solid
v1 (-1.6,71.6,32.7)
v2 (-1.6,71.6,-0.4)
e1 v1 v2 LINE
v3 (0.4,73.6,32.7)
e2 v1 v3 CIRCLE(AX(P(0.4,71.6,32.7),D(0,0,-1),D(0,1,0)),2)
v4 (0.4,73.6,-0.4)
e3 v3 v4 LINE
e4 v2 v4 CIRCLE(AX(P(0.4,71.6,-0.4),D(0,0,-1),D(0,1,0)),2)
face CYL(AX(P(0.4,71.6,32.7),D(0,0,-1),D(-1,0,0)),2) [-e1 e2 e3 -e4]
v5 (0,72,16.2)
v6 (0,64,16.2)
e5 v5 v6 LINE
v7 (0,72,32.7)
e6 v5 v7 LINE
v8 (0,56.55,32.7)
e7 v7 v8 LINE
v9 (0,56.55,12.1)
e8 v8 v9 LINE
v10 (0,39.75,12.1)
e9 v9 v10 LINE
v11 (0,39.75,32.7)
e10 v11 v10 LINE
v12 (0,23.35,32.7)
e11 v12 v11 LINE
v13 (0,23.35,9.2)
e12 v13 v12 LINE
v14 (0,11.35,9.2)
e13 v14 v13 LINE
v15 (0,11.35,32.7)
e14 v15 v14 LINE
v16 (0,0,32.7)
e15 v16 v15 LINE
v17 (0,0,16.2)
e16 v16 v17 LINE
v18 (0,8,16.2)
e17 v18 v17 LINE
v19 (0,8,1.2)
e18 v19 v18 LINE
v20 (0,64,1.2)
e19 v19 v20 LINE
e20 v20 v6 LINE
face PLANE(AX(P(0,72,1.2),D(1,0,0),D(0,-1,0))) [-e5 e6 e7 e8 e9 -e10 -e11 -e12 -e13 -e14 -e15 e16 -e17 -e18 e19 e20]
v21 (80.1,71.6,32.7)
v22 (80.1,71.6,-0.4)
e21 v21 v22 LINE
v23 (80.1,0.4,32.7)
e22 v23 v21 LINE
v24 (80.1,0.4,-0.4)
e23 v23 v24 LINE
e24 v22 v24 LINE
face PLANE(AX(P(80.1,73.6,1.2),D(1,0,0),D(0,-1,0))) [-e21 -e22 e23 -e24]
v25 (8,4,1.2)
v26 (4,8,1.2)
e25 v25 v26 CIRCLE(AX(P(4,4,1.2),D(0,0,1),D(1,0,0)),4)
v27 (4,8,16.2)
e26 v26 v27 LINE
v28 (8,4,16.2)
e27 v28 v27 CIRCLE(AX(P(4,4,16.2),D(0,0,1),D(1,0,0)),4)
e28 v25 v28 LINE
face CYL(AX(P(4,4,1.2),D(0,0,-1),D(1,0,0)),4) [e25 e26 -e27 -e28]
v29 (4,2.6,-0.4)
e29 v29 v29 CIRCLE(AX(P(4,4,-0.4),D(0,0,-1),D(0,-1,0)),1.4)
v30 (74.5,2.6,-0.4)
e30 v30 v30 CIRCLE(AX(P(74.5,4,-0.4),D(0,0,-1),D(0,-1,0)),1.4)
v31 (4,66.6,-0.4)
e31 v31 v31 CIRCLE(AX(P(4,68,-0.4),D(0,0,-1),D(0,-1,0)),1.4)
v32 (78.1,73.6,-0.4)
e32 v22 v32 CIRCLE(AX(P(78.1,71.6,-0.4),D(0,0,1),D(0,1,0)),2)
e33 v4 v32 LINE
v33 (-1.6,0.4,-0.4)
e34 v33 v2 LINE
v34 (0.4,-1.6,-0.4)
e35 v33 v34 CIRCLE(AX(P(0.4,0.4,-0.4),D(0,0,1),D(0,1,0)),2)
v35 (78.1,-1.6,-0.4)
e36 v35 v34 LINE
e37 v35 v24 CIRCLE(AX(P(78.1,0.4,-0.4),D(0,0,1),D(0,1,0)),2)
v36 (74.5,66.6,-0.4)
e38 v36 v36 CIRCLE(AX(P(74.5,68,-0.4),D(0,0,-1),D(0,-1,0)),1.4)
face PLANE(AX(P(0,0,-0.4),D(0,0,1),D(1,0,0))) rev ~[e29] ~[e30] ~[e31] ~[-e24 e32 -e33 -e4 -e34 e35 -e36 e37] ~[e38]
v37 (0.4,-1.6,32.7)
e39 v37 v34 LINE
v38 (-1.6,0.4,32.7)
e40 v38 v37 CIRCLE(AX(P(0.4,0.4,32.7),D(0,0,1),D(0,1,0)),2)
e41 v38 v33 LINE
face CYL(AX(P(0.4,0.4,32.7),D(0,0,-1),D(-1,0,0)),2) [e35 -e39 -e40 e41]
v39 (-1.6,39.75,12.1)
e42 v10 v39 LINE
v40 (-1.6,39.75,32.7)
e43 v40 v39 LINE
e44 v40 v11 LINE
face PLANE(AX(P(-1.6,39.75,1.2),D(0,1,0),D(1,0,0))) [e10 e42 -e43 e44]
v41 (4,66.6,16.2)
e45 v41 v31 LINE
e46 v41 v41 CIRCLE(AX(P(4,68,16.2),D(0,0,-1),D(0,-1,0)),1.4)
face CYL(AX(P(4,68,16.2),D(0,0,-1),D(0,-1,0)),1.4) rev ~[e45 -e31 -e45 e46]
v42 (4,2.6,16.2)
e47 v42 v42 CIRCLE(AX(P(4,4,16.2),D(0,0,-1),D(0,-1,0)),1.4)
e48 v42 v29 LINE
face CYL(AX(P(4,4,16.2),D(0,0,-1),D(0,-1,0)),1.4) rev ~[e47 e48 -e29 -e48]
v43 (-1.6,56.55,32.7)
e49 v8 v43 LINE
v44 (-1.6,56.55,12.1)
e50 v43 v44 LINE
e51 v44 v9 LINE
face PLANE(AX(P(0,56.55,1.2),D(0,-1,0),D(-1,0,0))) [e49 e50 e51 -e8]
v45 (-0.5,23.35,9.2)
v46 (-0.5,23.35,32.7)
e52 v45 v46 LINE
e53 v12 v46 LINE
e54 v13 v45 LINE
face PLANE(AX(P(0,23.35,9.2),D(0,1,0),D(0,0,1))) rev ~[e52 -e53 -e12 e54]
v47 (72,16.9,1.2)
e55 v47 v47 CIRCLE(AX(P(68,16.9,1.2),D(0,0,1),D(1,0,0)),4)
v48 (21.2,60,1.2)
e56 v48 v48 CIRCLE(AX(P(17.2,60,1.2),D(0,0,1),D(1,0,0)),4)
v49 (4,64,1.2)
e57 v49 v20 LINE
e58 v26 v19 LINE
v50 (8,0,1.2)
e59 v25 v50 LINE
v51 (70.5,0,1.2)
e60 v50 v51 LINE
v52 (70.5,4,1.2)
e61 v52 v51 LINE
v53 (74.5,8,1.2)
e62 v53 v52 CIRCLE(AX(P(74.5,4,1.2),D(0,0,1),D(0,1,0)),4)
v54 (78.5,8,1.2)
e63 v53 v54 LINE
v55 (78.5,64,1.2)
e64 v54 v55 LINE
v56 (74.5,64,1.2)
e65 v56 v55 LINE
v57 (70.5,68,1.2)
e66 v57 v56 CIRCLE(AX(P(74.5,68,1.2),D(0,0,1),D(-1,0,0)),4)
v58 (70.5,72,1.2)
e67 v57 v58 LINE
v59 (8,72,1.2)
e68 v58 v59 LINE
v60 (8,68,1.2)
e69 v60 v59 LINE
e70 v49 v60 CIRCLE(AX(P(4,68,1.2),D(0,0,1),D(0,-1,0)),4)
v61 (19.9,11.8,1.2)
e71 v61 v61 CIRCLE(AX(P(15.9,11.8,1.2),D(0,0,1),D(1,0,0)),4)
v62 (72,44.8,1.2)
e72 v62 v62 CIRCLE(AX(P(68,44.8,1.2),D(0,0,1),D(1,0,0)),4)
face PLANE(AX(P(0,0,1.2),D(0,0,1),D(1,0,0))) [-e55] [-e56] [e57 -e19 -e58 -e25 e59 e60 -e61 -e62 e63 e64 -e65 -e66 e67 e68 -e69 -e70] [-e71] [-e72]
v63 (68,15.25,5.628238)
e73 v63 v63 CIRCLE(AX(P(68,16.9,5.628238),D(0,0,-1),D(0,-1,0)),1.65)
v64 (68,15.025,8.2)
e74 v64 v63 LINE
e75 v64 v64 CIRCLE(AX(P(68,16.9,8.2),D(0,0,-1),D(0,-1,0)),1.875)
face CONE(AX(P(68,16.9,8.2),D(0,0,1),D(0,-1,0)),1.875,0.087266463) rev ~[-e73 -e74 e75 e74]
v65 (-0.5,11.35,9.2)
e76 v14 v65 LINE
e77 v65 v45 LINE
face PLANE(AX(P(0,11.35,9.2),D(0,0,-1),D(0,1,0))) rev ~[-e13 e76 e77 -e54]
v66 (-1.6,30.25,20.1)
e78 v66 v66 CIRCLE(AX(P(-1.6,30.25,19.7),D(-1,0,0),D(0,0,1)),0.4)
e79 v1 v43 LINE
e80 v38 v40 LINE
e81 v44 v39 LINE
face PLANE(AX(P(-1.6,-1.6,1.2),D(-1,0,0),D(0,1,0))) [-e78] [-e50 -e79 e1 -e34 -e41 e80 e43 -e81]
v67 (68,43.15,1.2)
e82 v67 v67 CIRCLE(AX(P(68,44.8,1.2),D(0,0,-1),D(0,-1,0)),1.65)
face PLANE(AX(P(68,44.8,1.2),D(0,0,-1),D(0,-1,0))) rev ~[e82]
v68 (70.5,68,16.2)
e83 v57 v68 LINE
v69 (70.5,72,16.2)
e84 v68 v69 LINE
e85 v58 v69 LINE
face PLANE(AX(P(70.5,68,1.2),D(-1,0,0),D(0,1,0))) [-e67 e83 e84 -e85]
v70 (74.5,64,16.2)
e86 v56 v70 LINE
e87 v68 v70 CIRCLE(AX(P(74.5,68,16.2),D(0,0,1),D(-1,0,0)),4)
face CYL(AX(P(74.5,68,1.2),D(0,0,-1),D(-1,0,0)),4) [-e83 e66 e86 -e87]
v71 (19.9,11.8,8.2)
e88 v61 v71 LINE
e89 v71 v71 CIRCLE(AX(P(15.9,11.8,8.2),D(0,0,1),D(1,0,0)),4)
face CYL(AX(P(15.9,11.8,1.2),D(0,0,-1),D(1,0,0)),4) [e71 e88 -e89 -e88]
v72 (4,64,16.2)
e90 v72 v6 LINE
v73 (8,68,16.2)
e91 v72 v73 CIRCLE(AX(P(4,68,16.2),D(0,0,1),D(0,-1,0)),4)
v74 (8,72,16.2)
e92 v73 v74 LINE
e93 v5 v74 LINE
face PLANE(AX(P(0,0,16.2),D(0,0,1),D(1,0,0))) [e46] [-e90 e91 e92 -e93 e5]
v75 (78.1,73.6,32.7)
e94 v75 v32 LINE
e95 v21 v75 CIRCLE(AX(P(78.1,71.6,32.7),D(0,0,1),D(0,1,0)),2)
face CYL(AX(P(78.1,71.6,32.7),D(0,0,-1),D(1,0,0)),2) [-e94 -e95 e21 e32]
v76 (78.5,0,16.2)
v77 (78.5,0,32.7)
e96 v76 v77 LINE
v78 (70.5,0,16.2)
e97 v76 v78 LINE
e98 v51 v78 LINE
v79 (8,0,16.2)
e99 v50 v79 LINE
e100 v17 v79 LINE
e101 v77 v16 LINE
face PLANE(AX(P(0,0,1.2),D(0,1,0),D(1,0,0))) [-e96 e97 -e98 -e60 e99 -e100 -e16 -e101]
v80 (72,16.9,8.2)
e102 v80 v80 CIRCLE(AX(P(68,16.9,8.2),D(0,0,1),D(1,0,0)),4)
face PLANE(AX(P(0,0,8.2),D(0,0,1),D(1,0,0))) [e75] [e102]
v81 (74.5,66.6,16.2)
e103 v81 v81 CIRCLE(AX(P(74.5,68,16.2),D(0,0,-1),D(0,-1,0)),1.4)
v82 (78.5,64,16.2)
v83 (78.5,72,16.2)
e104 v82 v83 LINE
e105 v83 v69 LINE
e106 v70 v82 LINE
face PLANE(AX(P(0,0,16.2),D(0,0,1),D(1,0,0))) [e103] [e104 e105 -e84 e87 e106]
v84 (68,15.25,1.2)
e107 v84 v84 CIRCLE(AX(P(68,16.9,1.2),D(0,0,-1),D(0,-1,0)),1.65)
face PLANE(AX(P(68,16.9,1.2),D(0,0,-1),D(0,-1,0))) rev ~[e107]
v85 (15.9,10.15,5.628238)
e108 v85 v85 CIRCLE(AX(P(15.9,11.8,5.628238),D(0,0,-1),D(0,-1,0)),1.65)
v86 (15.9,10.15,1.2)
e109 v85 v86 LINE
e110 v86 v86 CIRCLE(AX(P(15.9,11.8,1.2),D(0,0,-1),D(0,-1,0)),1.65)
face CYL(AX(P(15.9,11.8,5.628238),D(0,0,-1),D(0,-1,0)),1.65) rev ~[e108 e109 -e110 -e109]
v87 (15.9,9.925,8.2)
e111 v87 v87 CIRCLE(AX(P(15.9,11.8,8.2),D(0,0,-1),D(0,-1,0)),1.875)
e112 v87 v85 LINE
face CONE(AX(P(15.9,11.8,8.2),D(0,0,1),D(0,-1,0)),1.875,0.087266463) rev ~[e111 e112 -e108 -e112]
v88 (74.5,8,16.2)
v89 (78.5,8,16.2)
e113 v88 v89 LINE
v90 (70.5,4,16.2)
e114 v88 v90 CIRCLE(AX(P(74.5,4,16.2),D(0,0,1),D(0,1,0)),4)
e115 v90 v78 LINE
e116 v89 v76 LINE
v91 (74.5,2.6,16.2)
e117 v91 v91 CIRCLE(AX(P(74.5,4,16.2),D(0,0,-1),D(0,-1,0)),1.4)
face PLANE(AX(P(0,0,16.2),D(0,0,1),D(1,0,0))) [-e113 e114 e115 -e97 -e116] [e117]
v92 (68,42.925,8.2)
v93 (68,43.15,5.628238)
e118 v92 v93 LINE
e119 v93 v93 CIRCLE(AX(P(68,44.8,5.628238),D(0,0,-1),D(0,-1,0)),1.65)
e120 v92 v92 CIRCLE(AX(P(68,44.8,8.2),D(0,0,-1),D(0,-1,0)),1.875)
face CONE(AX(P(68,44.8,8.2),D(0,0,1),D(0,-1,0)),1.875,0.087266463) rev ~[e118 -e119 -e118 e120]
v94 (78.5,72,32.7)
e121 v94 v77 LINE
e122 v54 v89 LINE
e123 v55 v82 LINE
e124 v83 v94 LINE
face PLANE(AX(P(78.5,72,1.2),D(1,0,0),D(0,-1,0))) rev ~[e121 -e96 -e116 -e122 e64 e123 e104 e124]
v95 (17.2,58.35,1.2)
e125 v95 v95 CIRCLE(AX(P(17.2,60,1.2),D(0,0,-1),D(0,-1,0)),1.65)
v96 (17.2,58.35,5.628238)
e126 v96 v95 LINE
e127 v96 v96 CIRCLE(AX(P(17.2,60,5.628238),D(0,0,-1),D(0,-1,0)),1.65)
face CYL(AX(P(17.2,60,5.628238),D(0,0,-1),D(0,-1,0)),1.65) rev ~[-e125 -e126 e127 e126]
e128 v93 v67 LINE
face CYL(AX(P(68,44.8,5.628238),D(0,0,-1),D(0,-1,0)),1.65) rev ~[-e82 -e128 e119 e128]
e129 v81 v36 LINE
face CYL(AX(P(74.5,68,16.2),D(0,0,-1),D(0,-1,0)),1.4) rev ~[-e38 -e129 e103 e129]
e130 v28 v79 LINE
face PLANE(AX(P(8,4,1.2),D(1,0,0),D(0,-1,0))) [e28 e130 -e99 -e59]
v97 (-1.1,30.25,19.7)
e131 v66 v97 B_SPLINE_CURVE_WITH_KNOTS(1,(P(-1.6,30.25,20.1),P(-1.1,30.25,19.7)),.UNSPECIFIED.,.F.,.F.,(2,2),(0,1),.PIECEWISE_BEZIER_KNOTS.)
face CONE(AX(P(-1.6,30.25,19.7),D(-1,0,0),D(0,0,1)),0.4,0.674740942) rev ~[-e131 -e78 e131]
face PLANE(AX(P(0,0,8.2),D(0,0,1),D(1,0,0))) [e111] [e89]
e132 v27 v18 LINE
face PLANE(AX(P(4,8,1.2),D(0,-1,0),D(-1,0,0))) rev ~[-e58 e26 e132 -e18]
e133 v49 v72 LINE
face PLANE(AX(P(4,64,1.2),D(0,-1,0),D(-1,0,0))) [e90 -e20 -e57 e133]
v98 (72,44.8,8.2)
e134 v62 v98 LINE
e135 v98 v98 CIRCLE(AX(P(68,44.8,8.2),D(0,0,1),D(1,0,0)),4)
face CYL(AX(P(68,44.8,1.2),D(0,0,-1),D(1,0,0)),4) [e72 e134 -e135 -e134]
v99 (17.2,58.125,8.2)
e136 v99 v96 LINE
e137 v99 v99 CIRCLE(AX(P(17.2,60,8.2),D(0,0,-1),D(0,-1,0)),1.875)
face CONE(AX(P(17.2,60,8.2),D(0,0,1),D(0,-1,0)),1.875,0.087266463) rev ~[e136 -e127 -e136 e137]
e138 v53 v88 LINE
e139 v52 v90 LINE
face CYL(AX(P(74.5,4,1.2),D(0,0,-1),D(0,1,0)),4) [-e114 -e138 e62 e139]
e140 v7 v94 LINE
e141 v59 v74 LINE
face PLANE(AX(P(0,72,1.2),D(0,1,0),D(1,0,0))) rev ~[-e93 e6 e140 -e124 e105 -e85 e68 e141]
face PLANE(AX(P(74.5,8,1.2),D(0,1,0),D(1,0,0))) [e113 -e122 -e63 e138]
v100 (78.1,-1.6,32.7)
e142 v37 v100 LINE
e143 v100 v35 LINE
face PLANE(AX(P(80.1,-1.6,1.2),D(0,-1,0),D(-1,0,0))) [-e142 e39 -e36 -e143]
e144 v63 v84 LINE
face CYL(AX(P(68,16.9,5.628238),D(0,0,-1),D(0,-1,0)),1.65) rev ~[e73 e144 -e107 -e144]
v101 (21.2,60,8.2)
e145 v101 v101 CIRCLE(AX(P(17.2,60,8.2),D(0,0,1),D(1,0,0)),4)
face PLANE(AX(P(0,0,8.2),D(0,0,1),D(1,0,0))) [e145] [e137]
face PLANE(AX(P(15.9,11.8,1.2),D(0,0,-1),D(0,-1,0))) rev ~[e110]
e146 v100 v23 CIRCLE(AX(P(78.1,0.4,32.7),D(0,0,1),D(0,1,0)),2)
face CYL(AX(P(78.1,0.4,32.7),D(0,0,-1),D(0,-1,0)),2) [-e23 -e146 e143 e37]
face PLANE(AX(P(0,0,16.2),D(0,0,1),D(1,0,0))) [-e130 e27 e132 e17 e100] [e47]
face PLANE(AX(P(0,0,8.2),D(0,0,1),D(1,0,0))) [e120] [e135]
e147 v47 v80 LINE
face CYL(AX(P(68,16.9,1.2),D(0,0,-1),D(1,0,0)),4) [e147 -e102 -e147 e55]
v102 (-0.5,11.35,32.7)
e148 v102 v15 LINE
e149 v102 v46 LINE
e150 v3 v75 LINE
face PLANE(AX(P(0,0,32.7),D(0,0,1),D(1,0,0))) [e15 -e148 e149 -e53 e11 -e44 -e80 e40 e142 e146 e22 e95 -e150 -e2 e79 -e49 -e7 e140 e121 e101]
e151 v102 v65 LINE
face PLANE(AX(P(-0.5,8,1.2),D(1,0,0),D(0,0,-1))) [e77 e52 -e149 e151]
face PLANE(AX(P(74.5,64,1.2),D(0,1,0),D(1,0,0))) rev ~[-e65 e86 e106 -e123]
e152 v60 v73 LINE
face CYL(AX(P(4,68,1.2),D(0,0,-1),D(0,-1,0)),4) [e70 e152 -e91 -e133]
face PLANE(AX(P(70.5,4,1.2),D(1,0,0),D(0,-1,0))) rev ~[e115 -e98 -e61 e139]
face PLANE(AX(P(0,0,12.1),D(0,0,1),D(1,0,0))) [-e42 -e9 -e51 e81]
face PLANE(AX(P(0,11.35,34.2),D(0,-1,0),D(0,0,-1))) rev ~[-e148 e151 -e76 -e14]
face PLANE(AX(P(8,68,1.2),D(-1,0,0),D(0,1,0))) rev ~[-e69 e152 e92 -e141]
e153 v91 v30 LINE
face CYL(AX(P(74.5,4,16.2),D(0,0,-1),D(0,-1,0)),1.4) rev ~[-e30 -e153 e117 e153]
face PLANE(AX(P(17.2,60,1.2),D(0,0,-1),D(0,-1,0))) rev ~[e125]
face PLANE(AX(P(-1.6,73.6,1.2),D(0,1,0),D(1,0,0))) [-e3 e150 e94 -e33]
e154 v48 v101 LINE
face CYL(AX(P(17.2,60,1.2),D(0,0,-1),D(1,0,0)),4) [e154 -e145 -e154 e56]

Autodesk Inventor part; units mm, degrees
ref_plane "YZ Plane" through (0, 0, 0) normal (1, 0, 0) x (0, 1, 0)
ref_plane "XZ Plane" through (0, 0, 0) normal (0, 1, 0) x (-1, 0, 0)
sketch "Zakladna" plane through (0, 0, 0) normal (0, 0, 1) x (1, 0, 0)
  line L0 (0, 0) -> (78.5, 0)
  line L1 (78.5, 0) -> (78.5, 72)
  line L2 (78.5, 72) -> (0, 72)
  line L3 (0, 72) -> (0, 0)
  dimension "d0" = 78.5
  dimension "d1" = 72
extrude "Extrusion1" add sketch "Zakladna" along normal blind 1.2 and the other way blind 0.4
sketch "Uchyt_arduino" plane through (0, 0, 1.2) normal (0, 0, 1) x (1, 0, 0)
  circle A0 centre (17.2, 60) radius 4
  circle A1 centre (68, 44.8) radius 4
  circle A2 centre (68, 16.9) radius 4
  circle A3 centre (15.9, 11.8) radius 4
  line L0 (0, 72) -> (0, 0) projected
  dimension "d33" = 8
  dimension "d35" = 8
  dimension "d37" = 8
  dimension "d163" = 17.2
  dimension "d171" = 27.9
  dimension "d173" = 1.3
  dimension "d174" = 50.8
  dimension "d175" = 48.2
  dimension "d176" = 15.2
sketch "Spojeni_srouby" plane through (0, 0, 1.2) normal (0, 0, 1) x (1, 0, 0)
  line L0 (8, 4) -> (8, 0)
  arc A0 (8, 4) -> (4, 8) centre (4, 4) ccw
  line L1 (4, 8) -> (0, 8)
  line L2 (0, 72) -> (0, 0)
  line L3 (0, 8) -> (0, 0)
  line L4 (0, 0) -> (8, 0)
  line L5 (8, 68) -> (8, 72)
  arc A1 (4, 64) -> (8, 68) centre (4, 68) ccw
  line L6 (4, 64) -> (0, 64)
  line L7 (0, 0) -> (0, 72)
  line L8 (0, 64) -> (0, 72)
  line L9 (0, 72) -> (8, 72)
  line L10 (70.5, 4) -> (70.5, 0)
  arc A2 (74.5, 8) -> (70.5, 4) centre (74.5, 4) ccw
  line L11 (74.5, 8) -> (78.5, 8)
  line L12 (78.5, 8) -> (78.5, 0)
  line L13 (78.5, 0) -> (70.5, 0)
  line L14 (70.5, 68) -> (70.5, 72)
  arc A3 (70.5, 68) -> (74.5, 64) centre (74.5, 68) ccw
  line L15 (74.5, 64) -> (78.5, 64)
  line L16 (78.5, 64) -> (78.5, 72)
  line L17 (78.5, 72) -> (70.5, 72)
  line L18 (78.5, 0) -> (78.5, 72) projected
extrude "Extrusion2" add sketch "Uchyt_arduino" along normal blind 7
extrude "Extrusion5" add sketch "Spojeni_srouby" along normal blind 15
sketch "diry_srouby" plane through (0, 0, 16.2) normal (0, 0, 1) x (1, 0, 0)
  arc A0 (8, 4) -> (4, 8) centre (4, 4) ccw projected
  arc A1 (74.5, 8) -> (70.5, 4) centre (74.5, 4) ccw projected
  arc A2 (70.5, 68) -> (74.5, 64) centre (74.5, 68) ccw projected
  arc A3 (4, 64) -> (8, 68) centre (4, 68) ccw projected
  point P0 (0, 0)
hole "Hole6" at (4, 4, 16.2) at (74.5, 4, 16.2) at (74.5, 68, 16.2) at (4, 68, 16.2) direction (0, 0, -1) diameter 2.8 end through all
sketch "steny" plane through (0, 0, 1.2) normal (0, 0, 1) x (1, 0, 0)
  line L0 (0, 72) -> (0, 56.55)
  line L1 (0, 56.55) -> (-1.6, 56.55)
  line L2 (-1.6, 56.55) -> (-1.6, 72)
  line L3 (-1.6, 72) -> (-1.6, 73.6)
  line L4 (-1.6, 73.6) -> (80.1, 73.6)
  line L5 (80.1, 73.6) -> (80.1, 0)
  line L6 (80.1, 0) -> (80.1, -1.6)
  line L7 (80.1, -1.6) -> (0, -1.6)
  line L8 (0, -1.6) -> (-1.6, -1.6)
  line L9 (-1.6, -1.6) -> (-1.6, 39.75)
  line L10 (-1.6, 39.75) -> (0, 39.75)
  line L11 (0, 0) -> (0, 72) projected
  line L12 (0, 39.75) -> (0, 0)
  line L13 (0, 0) -> (78.5, 0)
  line L14 (8, 0) -> (78.5, 0) projected
  line L15 (78.5, 0) -> (0, 0) projected
  line L16 (78.5, 0) -> (0, 0)
  line L17 (78.5, 72) -> (78.5, 0) projected
  line L18 (0, 0) -> (78.5, 0)
  line L19 (78.5, 0) -> (78.5, 72)
  line L20 (0, 72) -> (78.5, 72) projected
  line L21 (78.5, 72) -> (0, 72)
  line L22 (92, 0) -> (92, 8) projected
  point P0 (78.5, 0)
  point P1 (78.5, 8)
  dimension "d133" = 15.45
  dimension "d134" = 1.6
  dimension "d135" = 1.6
  dimension "d137" = 1.6
  dimension "d138" = 1.6
  dimension "d139" = 16.8
  dimension "d179" = 1.6
extrude "Extrusion6" add sketch "steny" along normal blind 31.5 and the other way blind 1.6 contours L0 L1 L2 L3 L4 L5 L6 L7 L8 L9 L10 L11 L13 L17 L20
sketch "stena_RJ45" plane through (0, 0, 1.2) normal (0, 0, 1) x (1, 0, 0)
  line L0 (-1.6, 56.55) -> (0, 56.55) projected
  line L1 (0, 39.75) -> (-1.6, 39.75) projected
  line L2 (-1.6, 39.75) -> (0, 39.75)
  line L3 (0, 56.55) -> (0, 39.75) projected
  line L4 (0, 56.55) -> (0, 39.75)
  line L5 (0, 56.55) -> (-1.6, 56.55)
  line L6 (-1.6, 56.55) -> (-1.6, 39.75)
  line L7 (0, 39.75) -> (-1.6, 39.75)
  point P0 (0, 0)
extrude "Extrusion7" add sketch "stena_RJ45" along normal blind 10.9 and the other way blind 1.6
sketch "arduino_uchyt_zavitovaVlozka" plane through (17.2, 60, 8.2) normal (0, 0, 1) x (1, 0, 0)
  circle A0 centre (50.8, -43.1) radius 4 projected
  circle A1 centre (50.8, -15.2) radius 4 projected
  circle A2 centre (0, 0) radius 4 projected
  circle A3 centre (-1.3, -48.2) radius 4 projected
  point P0 (-17.2, -60)
hole "Hole7" at (68, 16.9, 8.2) at (68, 44.8, 8.2) at (17.2, 60, 8.2) at (15.9, 11.8, 8.2) direction (0, 0, -1) diameter 3.3 depth 7 countersink diameter 3.75 countersink angle 10
sketch "napajeni_znacka1" plane through (-1.6, -1.6, -0.4) normal (-1, 0, 0) x (0, 0, 1)
  circle A0 centre (20.1, 31.85) radius 0.4
  line L0 (12.5, 41.35) -> (33.1, 41.35) projected
  line L1 (0, 0) -> (0, 75.2) projected
  point P0 (0.4, 1.6)
  dimension "d155" = 0.8
  dimension "d156" = 9.5
  dimension "d157" = 20.1
ref_plane "napajeni_znacka2_rovina" through (-1.1, -1.6, -0.4) normal (-1, 0, 0) x (0, 0, 1)
sketch "napajeni_znacka2" plane through (-1.1, -1.6, -0.4) normal (-1, 0, 0) x (0, 0, 1)
  point P0 (0.4, 1.6)
  point P1 (20.1, 31.85)
  point P2 (20.1, 31.85)
loft "Loft4" cut profiles "napajeni_znacka1" section 2 point at (-1.1, 30.25, 19.7)
sketch "vyrez_nepouzity_jack" plane through (0, 8, 1.2) normal (1, 0, 0) x (0, 0, -1)
  line L0 (-8, 15.35) -> (-33, 15.35)
  line L1 (-33, 15.35) -> (-33, 3.35)
  line L2 (-33, 3.35) -> (-8, 3.35)
  line L3 (-8, 3.35) -> (-8, 15.35)
  line L4 (-10.9, 31.75) -> (-31.5, 31.75) projected
  line L5 (0, 56) -> (0, 0) projected
  point P0 (1.2, -8)
  dimension "d164" = 25
  dimension "d165" = 12
  dimension "d166" = 16.4
  dimension "d167" = 8
extrude "Extrusion8" cut sketch "vyrez_nepouzity_jack" against normal blind 0.5
fillet "Fillet1" radius 2 4 edges at (-1.6, -1.6, 16.15) (80.1, -1.6, 16.15) (-1.6, 73.6, 16.15) (80.1, 73.6, 16.15)
properties part number "case_bottom"
